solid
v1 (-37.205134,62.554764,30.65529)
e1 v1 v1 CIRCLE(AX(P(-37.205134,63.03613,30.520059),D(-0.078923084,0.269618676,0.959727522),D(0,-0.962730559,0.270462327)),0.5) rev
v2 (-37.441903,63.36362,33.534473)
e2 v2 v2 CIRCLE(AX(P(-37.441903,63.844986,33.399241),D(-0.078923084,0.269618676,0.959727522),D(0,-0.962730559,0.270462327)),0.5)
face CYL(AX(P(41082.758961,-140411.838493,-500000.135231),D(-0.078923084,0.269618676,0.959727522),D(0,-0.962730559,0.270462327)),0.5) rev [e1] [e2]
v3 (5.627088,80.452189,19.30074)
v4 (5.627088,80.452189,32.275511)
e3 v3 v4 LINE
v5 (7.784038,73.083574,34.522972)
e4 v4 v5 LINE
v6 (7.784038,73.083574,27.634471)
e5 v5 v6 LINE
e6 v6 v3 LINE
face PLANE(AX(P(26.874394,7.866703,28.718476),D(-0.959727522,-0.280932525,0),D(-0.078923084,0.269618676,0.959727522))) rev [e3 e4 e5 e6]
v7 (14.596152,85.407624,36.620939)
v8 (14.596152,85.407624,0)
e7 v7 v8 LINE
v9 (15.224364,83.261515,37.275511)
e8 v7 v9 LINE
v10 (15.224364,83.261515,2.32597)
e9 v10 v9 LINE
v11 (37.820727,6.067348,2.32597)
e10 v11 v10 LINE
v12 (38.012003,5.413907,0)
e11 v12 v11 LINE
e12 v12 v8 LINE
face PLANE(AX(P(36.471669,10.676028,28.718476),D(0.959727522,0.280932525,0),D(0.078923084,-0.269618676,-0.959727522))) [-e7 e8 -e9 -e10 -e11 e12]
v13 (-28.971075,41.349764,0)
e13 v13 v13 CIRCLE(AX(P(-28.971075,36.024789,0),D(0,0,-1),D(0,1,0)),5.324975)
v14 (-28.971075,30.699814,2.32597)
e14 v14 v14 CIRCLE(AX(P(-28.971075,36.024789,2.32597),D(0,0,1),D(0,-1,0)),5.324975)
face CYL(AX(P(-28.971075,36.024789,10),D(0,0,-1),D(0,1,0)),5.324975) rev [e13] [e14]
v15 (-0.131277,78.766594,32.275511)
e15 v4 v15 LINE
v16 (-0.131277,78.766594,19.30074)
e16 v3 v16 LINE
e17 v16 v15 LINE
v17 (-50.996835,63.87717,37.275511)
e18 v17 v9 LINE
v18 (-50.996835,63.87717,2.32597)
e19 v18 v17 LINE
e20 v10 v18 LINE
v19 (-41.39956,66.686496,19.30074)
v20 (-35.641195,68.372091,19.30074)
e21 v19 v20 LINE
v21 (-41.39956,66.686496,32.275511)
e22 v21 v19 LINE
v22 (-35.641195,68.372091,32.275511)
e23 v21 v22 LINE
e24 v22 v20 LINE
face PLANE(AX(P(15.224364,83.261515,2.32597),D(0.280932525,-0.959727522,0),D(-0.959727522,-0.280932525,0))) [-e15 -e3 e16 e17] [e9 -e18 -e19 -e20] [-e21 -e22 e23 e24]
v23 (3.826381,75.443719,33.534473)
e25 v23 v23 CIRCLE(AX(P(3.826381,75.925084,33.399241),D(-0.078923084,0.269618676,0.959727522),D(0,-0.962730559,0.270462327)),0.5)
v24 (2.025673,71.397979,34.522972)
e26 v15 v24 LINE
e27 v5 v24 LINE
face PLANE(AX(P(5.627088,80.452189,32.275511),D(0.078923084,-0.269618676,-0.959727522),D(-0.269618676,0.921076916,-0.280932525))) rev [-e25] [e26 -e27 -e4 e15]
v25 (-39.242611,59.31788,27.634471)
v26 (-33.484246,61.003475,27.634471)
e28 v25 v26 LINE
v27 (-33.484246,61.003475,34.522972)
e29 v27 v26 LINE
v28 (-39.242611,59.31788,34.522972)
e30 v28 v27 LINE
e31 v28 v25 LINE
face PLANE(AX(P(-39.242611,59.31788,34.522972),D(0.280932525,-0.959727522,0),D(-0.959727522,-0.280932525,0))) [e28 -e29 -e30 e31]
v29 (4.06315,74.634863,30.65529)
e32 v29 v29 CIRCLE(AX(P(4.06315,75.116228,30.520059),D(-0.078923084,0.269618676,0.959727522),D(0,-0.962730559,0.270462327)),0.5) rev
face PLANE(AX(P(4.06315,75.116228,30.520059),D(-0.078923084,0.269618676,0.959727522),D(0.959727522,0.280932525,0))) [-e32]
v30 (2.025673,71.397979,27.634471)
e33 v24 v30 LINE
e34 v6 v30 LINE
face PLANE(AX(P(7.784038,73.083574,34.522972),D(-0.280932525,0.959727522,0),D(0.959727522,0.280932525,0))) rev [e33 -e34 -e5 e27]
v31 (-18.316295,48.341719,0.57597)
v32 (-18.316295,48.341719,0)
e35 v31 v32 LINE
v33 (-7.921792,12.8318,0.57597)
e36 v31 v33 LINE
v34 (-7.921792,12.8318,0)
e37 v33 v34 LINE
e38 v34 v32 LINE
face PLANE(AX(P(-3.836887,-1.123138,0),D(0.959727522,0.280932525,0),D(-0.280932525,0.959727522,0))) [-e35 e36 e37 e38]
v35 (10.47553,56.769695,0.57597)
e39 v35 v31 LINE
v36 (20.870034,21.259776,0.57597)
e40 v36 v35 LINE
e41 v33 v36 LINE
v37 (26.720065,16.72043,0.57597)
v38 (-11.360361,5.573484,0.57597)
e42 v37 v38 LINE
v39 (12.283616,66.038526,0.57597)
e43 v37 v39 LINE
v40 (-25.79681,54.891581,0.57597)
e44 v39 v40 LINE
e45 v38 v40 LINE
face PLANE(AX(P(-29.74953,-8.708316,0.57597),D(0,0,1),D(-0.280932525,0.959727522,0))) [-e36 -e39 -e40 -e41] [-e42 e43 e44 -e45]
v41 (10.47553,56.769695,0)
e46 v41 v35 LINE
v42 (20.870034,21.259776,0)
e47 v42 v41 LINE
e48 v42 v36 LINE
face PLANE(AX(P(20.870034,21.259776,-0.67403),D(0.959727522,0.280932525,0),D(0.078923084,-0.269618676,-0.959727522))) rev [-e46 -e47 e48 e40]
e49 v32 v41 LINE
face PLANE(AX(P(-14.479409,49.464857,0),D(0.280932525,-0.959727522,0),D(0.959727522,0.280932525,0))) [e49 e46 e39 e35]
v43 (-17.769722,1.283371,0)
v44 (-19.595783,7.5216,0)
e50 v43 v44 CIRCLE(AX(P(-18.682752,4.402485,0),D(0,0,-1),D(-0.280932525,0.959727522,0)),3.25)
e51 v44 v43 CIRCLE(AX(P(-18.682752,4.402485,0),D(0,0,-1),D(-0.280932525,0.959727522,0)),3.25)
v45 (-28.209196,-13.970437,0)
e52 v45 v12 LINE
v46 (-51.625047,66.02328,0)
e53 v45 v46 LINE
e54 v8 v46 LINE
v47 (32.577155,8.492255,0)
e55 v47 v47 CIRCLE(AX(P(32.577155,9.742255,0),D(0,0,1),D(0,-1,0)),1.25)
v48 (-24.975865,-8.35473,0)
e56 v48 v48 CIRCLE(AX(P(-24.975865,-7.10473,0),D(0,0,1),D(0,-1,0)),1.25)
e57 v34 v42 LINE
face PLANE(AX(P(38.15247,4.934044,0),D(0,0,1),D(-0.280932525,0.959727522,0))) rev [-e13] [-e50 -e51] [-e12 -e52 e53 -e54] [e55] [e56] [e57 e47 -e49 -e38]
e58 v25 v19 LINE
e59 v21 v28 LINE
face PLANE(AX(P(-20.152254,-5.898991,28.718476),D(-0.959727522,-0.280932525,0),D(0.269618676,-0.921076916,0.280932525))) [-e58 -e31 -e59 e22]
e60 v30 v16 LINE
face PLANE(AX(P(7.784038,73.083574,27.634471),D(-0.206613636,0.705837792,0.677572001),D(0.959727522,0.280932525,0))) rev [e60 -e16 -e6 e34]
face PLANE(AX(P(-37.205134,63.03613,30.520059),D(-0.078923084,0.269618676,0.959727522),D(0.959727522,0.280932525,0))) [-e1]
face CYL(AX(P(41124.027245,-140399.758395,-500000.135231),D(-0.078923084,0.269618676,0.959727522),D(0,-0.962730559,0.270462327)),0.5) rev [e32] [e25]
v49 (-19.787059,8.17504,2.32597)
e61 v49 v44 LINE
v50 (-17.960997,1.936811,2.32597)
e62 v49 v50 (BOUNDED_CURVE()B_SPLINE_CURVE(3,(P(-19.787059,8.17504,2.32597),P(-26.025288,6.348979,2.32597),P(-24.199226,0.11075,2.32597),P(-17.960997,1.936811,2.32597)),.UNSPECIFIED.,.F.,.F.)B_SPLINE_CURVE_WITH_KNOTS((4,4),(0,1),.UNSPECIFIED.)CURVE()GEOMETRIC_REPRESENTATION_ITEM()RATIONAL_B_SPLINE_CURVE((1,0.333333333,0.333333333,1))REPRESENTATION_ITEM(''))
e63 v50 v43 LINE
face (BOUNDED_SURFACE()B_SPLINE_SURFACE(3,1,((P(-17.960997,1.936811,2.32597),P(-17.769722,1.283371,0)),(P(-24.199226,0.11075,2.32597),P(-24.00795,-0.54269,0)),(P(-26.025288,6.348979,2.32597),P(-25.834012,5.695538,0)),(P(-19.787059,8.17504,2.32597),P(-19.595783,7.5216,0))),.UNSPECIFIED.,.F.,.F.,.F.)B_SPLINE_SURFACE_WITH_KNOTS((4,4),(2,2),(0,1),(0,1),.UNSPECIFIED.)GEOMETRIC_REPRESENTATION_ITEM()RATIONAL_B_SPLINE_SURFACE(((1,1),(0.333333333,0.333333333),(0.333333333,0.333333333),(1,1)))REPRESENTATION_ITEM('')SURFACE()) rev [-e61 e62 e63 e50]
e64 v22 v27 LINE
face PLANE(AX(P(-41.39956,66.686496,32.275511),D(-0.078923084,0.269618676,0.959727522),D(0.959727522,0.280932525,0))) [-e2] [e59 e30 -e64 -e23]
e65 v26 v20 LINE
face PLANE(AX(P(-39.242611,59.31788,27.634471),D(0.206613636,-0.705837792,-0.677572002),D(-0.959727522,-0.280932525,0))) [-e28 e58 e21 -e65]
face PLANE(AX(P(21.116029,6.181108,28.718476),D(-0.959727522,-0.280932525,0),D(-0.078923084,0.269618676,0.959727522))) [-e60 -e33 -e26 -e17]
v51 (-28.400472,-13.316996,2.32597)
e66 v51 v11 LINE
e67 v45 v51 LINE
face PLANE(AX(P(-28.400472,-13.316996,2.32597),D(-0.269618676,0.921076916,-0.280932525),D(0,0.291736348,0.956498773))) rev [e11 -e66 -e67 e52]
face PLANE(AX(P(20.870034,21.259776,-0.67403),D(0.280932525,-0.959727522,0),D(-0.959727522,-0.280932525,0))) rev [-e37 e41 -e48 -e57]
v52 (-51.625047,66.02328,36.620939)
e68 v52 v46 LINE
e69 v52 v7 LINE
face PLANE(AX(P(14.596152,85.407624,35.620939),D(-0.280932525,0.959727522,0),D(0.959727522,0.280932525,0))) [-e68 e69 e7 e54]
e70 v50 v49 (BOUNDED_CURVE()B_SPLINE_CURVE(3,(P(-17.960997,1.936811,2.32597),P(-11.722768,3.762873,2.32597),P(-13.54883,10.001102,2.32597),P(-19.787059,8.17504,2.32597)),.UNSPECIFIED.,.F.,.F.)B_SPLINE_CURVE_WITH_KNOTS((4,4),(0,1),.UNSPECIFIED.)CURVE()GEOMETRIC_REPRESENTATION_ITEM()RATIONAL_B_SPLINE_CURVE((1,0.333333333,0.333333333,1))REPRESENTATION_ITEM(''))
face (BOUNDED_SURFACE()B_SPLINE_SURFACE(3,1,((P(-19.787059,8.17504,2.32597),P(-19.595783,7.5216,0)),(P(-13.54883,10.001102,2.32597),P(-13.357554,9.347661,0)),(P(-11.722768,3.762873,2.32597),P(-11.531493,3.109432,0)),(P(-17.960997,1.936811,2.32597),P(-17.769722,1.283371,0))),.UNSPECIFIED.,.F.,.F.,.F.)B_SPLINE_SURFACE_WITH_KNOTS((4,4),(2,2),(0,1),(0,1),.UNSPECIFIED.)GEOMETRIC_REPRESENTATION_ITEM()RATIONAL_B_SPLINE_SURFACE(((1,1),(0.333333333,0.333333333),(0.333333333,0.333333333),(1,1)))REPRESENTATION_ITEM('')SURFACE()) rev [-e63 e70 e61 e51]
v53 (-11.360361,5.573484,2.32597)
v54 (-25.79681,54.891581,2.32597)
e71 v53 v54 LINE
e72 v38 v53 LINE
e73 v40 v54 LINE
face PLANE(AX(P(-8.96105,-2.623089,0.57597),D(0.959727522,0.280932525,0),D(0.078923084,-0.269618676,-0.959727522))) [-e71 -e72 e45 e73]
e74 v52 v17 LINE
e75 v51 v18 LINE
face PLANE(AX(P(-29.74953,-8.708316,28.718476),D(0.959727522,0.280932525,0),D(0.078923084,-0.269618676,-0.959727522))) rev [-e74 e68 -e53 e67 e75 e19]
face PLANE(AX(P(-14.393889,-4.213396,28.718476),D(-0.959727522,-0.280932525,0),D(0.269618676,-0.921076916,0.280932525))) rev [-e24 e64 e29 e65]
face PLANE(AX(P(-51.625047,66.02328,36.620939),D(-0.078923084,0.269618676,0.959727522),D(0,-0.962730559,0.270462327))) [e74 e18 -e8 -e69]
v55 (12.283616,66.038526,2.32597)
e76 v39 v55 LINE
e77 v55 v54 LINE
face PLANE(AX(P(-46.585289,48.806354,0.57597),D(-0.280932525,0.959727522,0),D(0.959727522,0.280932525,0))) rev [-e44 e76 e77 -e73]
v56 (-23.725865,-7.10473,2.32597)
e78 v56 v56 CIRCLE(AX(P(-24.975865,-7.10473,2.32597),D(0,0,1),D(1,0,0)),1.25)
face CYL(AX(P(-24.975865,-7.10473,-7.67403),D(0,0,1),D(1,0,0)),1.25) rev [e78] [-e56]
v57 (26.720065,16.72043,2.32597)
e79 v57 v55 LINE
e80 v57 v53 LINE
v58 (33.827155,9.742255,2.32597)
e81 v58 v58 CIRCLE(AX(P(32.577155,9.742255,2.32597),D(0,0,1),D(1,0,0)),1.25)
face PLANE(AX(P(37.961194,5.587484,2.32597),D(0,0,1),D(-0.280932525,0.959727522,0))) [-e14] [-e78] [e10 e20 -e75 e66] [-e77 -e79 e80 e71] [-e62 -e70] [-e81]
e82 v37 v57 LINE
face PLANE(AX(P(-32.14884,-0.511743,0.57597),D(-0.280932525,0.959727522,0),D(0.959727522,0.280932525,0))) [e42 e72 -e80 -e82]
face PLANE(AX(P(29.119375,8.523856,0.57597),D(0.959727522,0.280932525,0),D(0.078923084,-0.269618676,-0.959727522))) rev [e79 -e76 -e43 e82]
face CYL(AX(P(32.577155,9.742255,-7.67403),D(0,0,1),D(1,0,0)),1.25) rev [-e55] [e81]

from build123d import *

# Parameters (mm, degrees)
SALIENTE_EXTRUIR1_START       = 2.11e-07
SALIENTE_EXTRUIR1_DEPTH       = 36.2755111
SALIENTE_EXTRUIR1_START_2     = 19.300740439
SALIENTE_EXTRUIR1_2_DEPTH     = 15.222231072
SALIENTE_EXTRUIR1_3_DEPTH     = 0.575969357
SALIENTE_EXTRUIR1_START_3     = 0.575969568
SALIENTE_EXTRUIR1_4_DEPTH     = 1.75
SALIENTE_EXTRUIR1_START_4     = -30.997891642
SALIENTE_EXTRUIR1_5_DEPTH     = 69
SALIENTE_EXTRUIR1_6_OUTLINE_W = 15.703224266
SALIENTE_EXTRUIR1_6_OUTLINE_H = 2.325969357
SALIENTE_EXTRUIR1_6_DEPTH     = 69
SALIENTE_EXTRUIR1_7_DEPTH     = 21.66081402
SALIENTE_EXTRUIR1_START_5     = 30.341294328
SALIENTE_EXTRUIR1_8_DEPTH     = 7.66081403
SALIENTE_EXTRUIR2_DEPTH       = 1
CROQUIS3_R                    = 1.25
CORTAR_EXTRUIR1_DEPTH         = 10
CROQUIS4_R                    = 5.324975084
CORTAR_EXTRUIR2_DEPTH         = 10
SALIENTE_EXTRUIR3_DEPTH       = 69
CORTAR_EXTRUIR3_DEPTH         = 69
SALIENTE_EXTRUIR4_REACH       = 101.278
CROQUIS7_R                    = 1.25
CROQUIS7_R_2                  = 0.5


with BuildPart() as part:
    # Saliente-Extruir1: read off the stored shape, not the designer's step
    # Saliente-Extruir1 outline → Saliente-Extruir1 (new body)
    with BuildSketch(Plane.XY.offset(SALIENTE_EXTRUIR1_START)):
        Polygon((-51.625046866, 66.023279607), (-50.996835351, 63.877170392), (15.224363662, 83.261514624), (14.596152147, 85.407623839), align=None)
    extrude(amount=SALIENTE_EXTRUIR1_DEPTH)

    # Saliente-Extruir1 2 outline → Saliente-Extruir1 2 (add)
    with BuildSketch(Plane.XY.offset(SALIENTE_EXTRUIR1_START_2)):
        Polygon((-35.641195, 68.372090794), (-41.399560131, 66.686495643), (-39.242610722, 59.317880312), (-33.484245591, 61.003475463), align=None)
        Polygon((5.627088443, 80.452189373), (-0.131276689, 78.766594222), (2.02567272, 71.397978892), (7.784037852, 73.083574042), align=None)
    extrude(amount=SALIENTE_EXTRUIR1_2_DEPTH)

    # Saliente-Extruir1 3 outline → Saliente-Extruir1 3 (add)
    # profile 1 of 3: a face of its own
    with BuildSketch(Plane.XY.offset(SALIENTE_EXTRUIR1_START)):
        Polygon((-35.641195, 68.372090794), (-41.399560131, 66.686495643), (-39.242610722, 59.317880312), (-33.484245591, 61.003475463), align=None)
    # profile 2 of 3: a face of its own
    with BuildSketch(Plane.XY.offset(SALIENTE_EXTRUIR1_START)):
        Polygon((5.627088443, 80.452189373), (-0.131276689, 78.766594222), (2.02567272, 71.397978892), (7.784037852, 73.083574042), align=None)
    # profile 3 of 3: a face of its own
    with BuildSketch(Plane.XY.offset(SALIENTE_EXTRUIR1_START)):
        Polygon((-25.796809543, 54.891581059), (-11.360360521, 5.573484337), (26.720065065, 16.720429561), (12.283616043, 66.038526283), align=None)
        Polygon((-18.597227896, 49.301446301), (10.194597762, 57.729422054), (20.870033716, 21.259776221), (-7.921791942, 12.831800468), align=None, mode=Mode.SUBTRACT)
    extrude(amount=SALIENTE_EXTRUIR1_3_DEPTH)

    # Saliente-Extruir1 4 outline → Saliente-Extruir1 4 (add)
    with BuildSketch(Plane.XY.offset(SALIENTE_EXTRUIR1_START_3)):
        Polygon((-35.641195, 68.372090794), (-41.399560131, 66.686495643), (-39.242610722, 59.317880312), (-33.484245591, 61.003475463), align=None)
        Polygon((5.627088443, 80.452189373), (-0.131276689, 78.766594222), (2.02567272, 71.397978892), (7.784037852, 73.083574042), align=None)
    extrude(amount=SALIENTE_EXTRUIR1_4_DEPTH)

    # Saliente-Extruir1 5 outline → Saliente-Extruir1 5 (cut)
    with BuildSketch(Plane(origin=(0, 0, 0), x_dir=(-0.2809325251095079, 0.9597275219225484, 0), z_dir=(0.9597275219225485, 0.2809325251095079, 0)).offset(SALIENTE_EXTRUIR1_START_4)):
        Polygon((67.953527999, 19.300740439), (75.631348175, 19.300740439), (67.953528, 27.634470761), align=None)
        Polygon((67.953528, 34.522971511), (75.631348175, 32.275511311), (75.631348175, 34.522971511), align=None)
        Polygon((75.631348175, 36.275511311), (77.867513301, 35.620938527), (77.867513301, 36.275511311), align=None)
    extrude(amount=SALIENTE_EXTRUIR1_5_DEPTH, mode=Mode.SUBTRACT)

    # Saliente-Extruir1 6 outline → Saliente-Extruir1 6 (add)
    with BuildSketch(Plane(origin=(0, 0, 0), x_dir=(-0.2809325251095079, 0.9597275219225484, 0), z_dir=(0.9597275219225485, 0.2809325251095079, 0)).offset(SALIENTE_EXTRUIR1_START_4)):
        with Locations((67.779736042, 1.16298489)):
            Rectangle(SALIENTE_EXTRUIR1_6_OUTLINE_W, SALIENTE_EXTRUIR1_6_OUTLINE_H)
        Polygon((8.540521078, 2.11e-07), (8.540521079, 2.325969568), (-5.302071851, 2.325969568), (-5.982932231, 2.11e-07), align=None)
    extrude(amount=SALIENTE_EXTRUIR1_6_DEPTH)

    # Saliente-Extruir1 7 outline → Saliente-Extruir1 7 (add)
    with BuildSketch(Plane(origin=(0, 0, 0), x_dir=(-0.2809325251095079, 0.9597275219225484, 0), z_dir=(0.9597275219225485, 0.2809325251095079, 0)).offset(SALIENTE_EXTRUIR1_START_4)):
        Polygon((59.928123909, 2.11e-07), (59.928123909, 2.325969568), (8.540521079, 2.325969568), (8.540521078, 2.11e-07), align=None)
    extrude(amount=SALIENTE_EXTRUIR1_7_DEPTH)

    # Saliente-Extruir1 8 outline → Saliente-Extruir1 8 (add)
    with BuildSketch(Plane(origin=(0, 0, 0), x_dir=(-0.2809325251095079, 0.9597275219225484, 0), z_dir=(0.9597275219225485, 0.2809325251095079, 0)).offset(SALIENTE_EXTRUIR1_START_5)):
        Polygon((59.928123909, 2.11e-07), (59.928123909, 2.325969568), (8.540521079, 2.325969568), (8.540521078, 2.11e-07), align=None)
    extrude(amount=SALIENTE_EXTRUIR1_8_DEPTH)

    # Saliente-Extruir1 9: loft between two sections, ruled curve by curve
    saliente_extruir1_9_from = [
        Edge.make_bspline([(-17.960997328, 1.936811392, 2.325969568), (-24.199226221, 0.110749979, 2.325969568), (-26.025287634, 6.348978871, 2.325969568), (-19.787058741, 8.175040285, 2.325969568)], [0, 0, 0, 0, 1, 1, 1, 1], 3, [1, 0.333333333, 0.333333333, 1]),
        Edge.make_bspline([(-19.787058741, 8.175040285, 2.325969568), (-13.548829849, 10.001101698, 2.325969568), (-11.722768436, 3.762872805, 2.325969568), (-17.960997328, 1.936811392, 2.325969568)], [0, 0, 0, 0, 1, 1, 1, 1], 3, [1, 0.333333333, 0.333333333, 1]),
    ]
    saliente_extruir1_9_to = [
        Edge.make_bspline([(-17.769721503, 1.283370947, 2.11e-07), (-24.007950395, -0.542690466, 2.11e-07), (-25.834011808, 5.695538426, 2.11e-07), (-19.595782916, 7.52159984, 2.11e-07)], [0, 0, 0, 0, 1, 1, 1, 1], 3, [1, 0.333333333, 0.333333333, 1]),
        Edge.make_bspline([(-19.595782916, 7.52159984, 2.11e-07), (-13.357554023, 9.347661253, 2.11e-07), (-11.53149261, 3.10943236, 2.11e-07), (-17.769721503, 1.283370947, 2.11e-07)], [0, 0, 0, 0, 1, 1, 1, 1], 3, [1, 0.333333333, 0.333333333, 1]),
    ]
    saliente_extruir1_9 = Solid(Shell([*[Face.make_surface_from_curves(saliente_extruir1_9_from[k], saliente_extruir1_9_to[k]) for k in range(2)], Face(Wire(saliente_extruir1_9_from)), Face(Wire(saliente_extruir1_9_to))]))
    add(saliente_extruir1_9, mode=Mode.SUBTRACT)

    # Saliente-Extruir1 10: loft between two sections, ruled curve by curve
    saliente_extruir1_10_from = [
        Edge.make_three_point_arc((5.262809235, 75.46739376, 30.520058845), (3.726126487, 76.267574249, 30.168893189), (2.86349043, 74.765062447, 30.520058845)),
        Edge.make_three_point_arc((2.86349043, 74.765062447, 30.520058845), (4.400173178, 73.964881958, 30.871224502), (5.262809235, 75.46739376, 30.520058845)),
    ]
    saliente_extruir1_10_to = [
        Edge.make_three_point_arc((5.026039984, 76.276249789, 33.399241411), (3.489357236, 77.076430278, 33.048075755), (2.626721179, 75.573918476, 33.399241411)),
        Edge.make_three_point_arc((2.626721179, 75.573918476, 33.399241411), (4.163403927, 74.773737987, 33.750407067), (5.026039984, 76.276249789, 33.399241411)),
    ]
    saliente_extruir1_10 = Solid(Shell([*[Face.make_surface_from_curves(saliente_extruir1_10_from[k], saliente_extruir1_10_to[k]) for k in range(2)], Face(Wire(saliente_extruir1_10_from)), Face(Wire(saliente_extruir1_10_to))]))
    add(saliente_extruir1_10, mode=Mode.SUBTRACT)

    # Saliente-Extruir1 11: loft between two sections, ruled curve by curve
    saliente_extruir1_11_from = [
        Edge.make_three_point_arc((-36.868110265, 61.884783379, 30.871224502), (-36.005474208, 63.387295181, 30.520058845), (-37.542156955, 64.18747567, 30.168893189)),
        Edge.make_three_point_arc((-37.542156955, 64.18747567, 30.168893189), (-38.404793012, 62.684963868, 30.520058845), (-36.868110265, 61.884783379, 30.871224502)),
    ]
    saliente_extruir1_11_to = [
        Edge.make_three_point_arc((-37.104879516, 62.693639407, 33.750407067), (-36.242243459, 64.196151209, 33.399241411), (-37.778926206, 64.996331698, 33.048075755)),
        Edge.make_three_point_arc((-37.778926206, 64.996331698, 33.048075755), (-38.641562263, 63.493819896, 33.399241411), (-37.104879516, 62.693639407, 33.750407067)),
    ]
    saliente_extruir1_11 = Solid(Shell([*[Face.make_surface_from_curves(saliente_extruir1_11_from[k], saliente_extruir1_11_to[k]) for k in range(2)], Face(Wire(saliente_extruir1_11_from)), Face(Wire(saliente_extruir1_11_to))]))
    add(saliente_extruir1_11, mode=Mode.SUBTRACT)

    # Saliente-Extruir1 12: loft between two sections, ruled curve by curve
    saliente_extruir1_12_from = [
        Edge.make_three_point_arc((-30.979047738, 39.986658971, 2.325969568), (-25.396077527, 36.932081486, 2.325969568), (-28.450655012, 31.349111274, 2.325969568)),
        Edge.make_three_point_arc((-28.450655012, 31.349111274, 2.325969568), (-34.033625224, 34.40368876, 2.325969568), (-30.979047738, 39.986658971, 2.325969568)),
    ]
    saliente_extruir1_12_to = [
        Edge.make_three_point_arc((-30.979047738, 39.986658971, 2.11e-07), (-25.396077527, 36.932081486, 2.11e-07), (-28.450655012, 31.349111274, 2.11e-07)),
        Edge.make_three_point_arc((-28.450655012, 31.349111274, 2.11e-07), (-34.033625224, 34.40368876, 2.11e-07), (-30.979047738, 39.986658971, 2.11e-07)),
    ]
    saliente_extruir1_12 = Solid(Shell([*[Face.make_surface_from_curves(saliente_extruir1_12_from[k], saliente_extruir1_12_to[k]) for k in range(2)], Face(Wire(saliente_extruir1_12_from)), Face(Wire(saliente_extruir1_12_to))]))
    add(saliente_extruir1_12, mode=Mode.SUBTRACT)

    # Croquis2 → Saliente-Extruir2 (add)
    with BuildSketch(Plane(origin=(-14.760341257, 50.424584095, 0), x_dir=(-0.9597275219225485, -0.28093252510950767, 0), z_dir=(0.28093252510950767, -0.9597275219225485, 0))):
        Polygon((3.997891642, -0.575969568), (-26.002108358, -0.575969568), (-26.002108358, -2.11e-07), (3.997891642, 0), align=None)
    extrude(amount=SALIENTE_EXTRUIR2_DEPTH)

    # Croquis3 → Cortar-Extruir1 (cut)
    with BuildSketch(Plane.XY.offset(2.325969568)):
        with Locations((32.57715474, 9.742255252)):
            Circle(CROQUIS3_R)
        with Locations((-24.975865422, -7.104729869)):
            Circle(CROQUIS3_R)
    extrude(amount=-CORTAR_EXTRUIR1_DEPTH, mode=Mode.SUBTRACT)

    # Croquis4 → Cortar-Extruir2 (cut)
    with BuildSketch(Plane(origin=(0, 0, 0), x_dir=(-1, 0, 0), z_dir=(0, 0, -1))):
        with Locations(Location((28.971074723, 36.024788725, 0), (0, 0, 90))):
            Circle(CROQUIS4_R)
    extrude(amount=-CORTAR_EXTRUIR2_DEPTH, mode=Mode.SUBTRACT)

    # Croquis5 → Saliente-Extruir3 (add)
    with BuildSketch(Plane(origin=(36.471669282, 10.67602826, 0), x_dir=(0, 0, -1), z_dir=(0.9597275219225486, 0.28093252510950756, 0))):
        Polygon((-36.275511311, 75.631348175), (-37.275511311, 75.631348175), (-36.620938527, 77.867513301), (-35.620938527, 77.867513301), align=None)
    extrude(amount=-SALIENTE_EXTRUIR3_DEPTH)

    # Croquis6 → Cortar-Extruir3 (cut)
    with BuildSketch(Plane(origin=(36.471669282, 10.67602826, 0), x_dir=(0, 0, -1), z_dir=(0.9597275219225486, 0.28093252510950756, 0))):
        Polygon((-2.325969568, -5.302071851), (-2.325969568, -4.802071851), (-2.11e-07, -5.482932231), (-2.11e-07, -5.982932231), align=None)
    extrude(amount=-CORTAR_EXTRUIR3_DEPTH, mode=Mode.SUBTRACT)

    # Croquis7 → Saliente-Extruir4 (add, up to next)
    with BuildSketch(Plane(origin=(-4.121600365, 14.080296693, 50.119852402), x_dir=(0.9968807084425405, 0.021345720862208265, 0.07598166447223464), z_dir=(-0.07892308366440427, 0.2696186761507921, 0.9597275219225484)), mode=Mode.PRIVATE) as saliente_extruir4_sk1:
        with Locations((-33.424563455, 52.432282093)):
            Circle(CROQUIS7_R)
        with Locations(Location((-33.424563455, 52.432282093, 0), (0, 0, 270.000000004))):
            Circle(CROQUIS7_R_2, mode=Mode.SUBTRACT)
    saliente_extruir4_tool1 = extrude(saliente_extruir4_sk1.sketch, amount=-SALIENTE_EXTRUIR4_REACH, mode=Mode.PRIVATE) - part.part
    # Croquis7 → Saliente-Extruir4 (add, up to next)
    with BuildSketch(Plane(origin=(-4.121600365, 14.080296693, 50.119852402), x_dir=(0.9968807084425405, 0.021345720862208265, 0.07598166447223464), z_dir=(-0.07892308366440427, 0.2696186761507921, 0.9597275219225484)), mode=Mode.PRIVATE) as saliente_extruir4_sk2:
        with Locations((7.972850592, 64.062162154)):
            Circle(CROQUIS7_R)
        with Locations(Location((7.972850592, 64.062162154, 0), (0, 0, 270.000000007))):
            Circle(CROQUIS7_R_2, mode=Mode.SUBTRACT)
    saliente_extruir4_tool2 = extrude(saliente_extruir4_sk2.sketch, amount=-SALIENTE_EXTRUIR4_REACH, mode=Mode.PRIVATE) - part.part
    add(saliente_extruir4_tool1.solids().sort_by_distance((-38.652759, 63.819058, 33.306951))[0])
    add(saliente_extruir4_tool2.solids().sort_by_distance((2.615525, 75.899157, 33.306951))[0])


solid = part.part
